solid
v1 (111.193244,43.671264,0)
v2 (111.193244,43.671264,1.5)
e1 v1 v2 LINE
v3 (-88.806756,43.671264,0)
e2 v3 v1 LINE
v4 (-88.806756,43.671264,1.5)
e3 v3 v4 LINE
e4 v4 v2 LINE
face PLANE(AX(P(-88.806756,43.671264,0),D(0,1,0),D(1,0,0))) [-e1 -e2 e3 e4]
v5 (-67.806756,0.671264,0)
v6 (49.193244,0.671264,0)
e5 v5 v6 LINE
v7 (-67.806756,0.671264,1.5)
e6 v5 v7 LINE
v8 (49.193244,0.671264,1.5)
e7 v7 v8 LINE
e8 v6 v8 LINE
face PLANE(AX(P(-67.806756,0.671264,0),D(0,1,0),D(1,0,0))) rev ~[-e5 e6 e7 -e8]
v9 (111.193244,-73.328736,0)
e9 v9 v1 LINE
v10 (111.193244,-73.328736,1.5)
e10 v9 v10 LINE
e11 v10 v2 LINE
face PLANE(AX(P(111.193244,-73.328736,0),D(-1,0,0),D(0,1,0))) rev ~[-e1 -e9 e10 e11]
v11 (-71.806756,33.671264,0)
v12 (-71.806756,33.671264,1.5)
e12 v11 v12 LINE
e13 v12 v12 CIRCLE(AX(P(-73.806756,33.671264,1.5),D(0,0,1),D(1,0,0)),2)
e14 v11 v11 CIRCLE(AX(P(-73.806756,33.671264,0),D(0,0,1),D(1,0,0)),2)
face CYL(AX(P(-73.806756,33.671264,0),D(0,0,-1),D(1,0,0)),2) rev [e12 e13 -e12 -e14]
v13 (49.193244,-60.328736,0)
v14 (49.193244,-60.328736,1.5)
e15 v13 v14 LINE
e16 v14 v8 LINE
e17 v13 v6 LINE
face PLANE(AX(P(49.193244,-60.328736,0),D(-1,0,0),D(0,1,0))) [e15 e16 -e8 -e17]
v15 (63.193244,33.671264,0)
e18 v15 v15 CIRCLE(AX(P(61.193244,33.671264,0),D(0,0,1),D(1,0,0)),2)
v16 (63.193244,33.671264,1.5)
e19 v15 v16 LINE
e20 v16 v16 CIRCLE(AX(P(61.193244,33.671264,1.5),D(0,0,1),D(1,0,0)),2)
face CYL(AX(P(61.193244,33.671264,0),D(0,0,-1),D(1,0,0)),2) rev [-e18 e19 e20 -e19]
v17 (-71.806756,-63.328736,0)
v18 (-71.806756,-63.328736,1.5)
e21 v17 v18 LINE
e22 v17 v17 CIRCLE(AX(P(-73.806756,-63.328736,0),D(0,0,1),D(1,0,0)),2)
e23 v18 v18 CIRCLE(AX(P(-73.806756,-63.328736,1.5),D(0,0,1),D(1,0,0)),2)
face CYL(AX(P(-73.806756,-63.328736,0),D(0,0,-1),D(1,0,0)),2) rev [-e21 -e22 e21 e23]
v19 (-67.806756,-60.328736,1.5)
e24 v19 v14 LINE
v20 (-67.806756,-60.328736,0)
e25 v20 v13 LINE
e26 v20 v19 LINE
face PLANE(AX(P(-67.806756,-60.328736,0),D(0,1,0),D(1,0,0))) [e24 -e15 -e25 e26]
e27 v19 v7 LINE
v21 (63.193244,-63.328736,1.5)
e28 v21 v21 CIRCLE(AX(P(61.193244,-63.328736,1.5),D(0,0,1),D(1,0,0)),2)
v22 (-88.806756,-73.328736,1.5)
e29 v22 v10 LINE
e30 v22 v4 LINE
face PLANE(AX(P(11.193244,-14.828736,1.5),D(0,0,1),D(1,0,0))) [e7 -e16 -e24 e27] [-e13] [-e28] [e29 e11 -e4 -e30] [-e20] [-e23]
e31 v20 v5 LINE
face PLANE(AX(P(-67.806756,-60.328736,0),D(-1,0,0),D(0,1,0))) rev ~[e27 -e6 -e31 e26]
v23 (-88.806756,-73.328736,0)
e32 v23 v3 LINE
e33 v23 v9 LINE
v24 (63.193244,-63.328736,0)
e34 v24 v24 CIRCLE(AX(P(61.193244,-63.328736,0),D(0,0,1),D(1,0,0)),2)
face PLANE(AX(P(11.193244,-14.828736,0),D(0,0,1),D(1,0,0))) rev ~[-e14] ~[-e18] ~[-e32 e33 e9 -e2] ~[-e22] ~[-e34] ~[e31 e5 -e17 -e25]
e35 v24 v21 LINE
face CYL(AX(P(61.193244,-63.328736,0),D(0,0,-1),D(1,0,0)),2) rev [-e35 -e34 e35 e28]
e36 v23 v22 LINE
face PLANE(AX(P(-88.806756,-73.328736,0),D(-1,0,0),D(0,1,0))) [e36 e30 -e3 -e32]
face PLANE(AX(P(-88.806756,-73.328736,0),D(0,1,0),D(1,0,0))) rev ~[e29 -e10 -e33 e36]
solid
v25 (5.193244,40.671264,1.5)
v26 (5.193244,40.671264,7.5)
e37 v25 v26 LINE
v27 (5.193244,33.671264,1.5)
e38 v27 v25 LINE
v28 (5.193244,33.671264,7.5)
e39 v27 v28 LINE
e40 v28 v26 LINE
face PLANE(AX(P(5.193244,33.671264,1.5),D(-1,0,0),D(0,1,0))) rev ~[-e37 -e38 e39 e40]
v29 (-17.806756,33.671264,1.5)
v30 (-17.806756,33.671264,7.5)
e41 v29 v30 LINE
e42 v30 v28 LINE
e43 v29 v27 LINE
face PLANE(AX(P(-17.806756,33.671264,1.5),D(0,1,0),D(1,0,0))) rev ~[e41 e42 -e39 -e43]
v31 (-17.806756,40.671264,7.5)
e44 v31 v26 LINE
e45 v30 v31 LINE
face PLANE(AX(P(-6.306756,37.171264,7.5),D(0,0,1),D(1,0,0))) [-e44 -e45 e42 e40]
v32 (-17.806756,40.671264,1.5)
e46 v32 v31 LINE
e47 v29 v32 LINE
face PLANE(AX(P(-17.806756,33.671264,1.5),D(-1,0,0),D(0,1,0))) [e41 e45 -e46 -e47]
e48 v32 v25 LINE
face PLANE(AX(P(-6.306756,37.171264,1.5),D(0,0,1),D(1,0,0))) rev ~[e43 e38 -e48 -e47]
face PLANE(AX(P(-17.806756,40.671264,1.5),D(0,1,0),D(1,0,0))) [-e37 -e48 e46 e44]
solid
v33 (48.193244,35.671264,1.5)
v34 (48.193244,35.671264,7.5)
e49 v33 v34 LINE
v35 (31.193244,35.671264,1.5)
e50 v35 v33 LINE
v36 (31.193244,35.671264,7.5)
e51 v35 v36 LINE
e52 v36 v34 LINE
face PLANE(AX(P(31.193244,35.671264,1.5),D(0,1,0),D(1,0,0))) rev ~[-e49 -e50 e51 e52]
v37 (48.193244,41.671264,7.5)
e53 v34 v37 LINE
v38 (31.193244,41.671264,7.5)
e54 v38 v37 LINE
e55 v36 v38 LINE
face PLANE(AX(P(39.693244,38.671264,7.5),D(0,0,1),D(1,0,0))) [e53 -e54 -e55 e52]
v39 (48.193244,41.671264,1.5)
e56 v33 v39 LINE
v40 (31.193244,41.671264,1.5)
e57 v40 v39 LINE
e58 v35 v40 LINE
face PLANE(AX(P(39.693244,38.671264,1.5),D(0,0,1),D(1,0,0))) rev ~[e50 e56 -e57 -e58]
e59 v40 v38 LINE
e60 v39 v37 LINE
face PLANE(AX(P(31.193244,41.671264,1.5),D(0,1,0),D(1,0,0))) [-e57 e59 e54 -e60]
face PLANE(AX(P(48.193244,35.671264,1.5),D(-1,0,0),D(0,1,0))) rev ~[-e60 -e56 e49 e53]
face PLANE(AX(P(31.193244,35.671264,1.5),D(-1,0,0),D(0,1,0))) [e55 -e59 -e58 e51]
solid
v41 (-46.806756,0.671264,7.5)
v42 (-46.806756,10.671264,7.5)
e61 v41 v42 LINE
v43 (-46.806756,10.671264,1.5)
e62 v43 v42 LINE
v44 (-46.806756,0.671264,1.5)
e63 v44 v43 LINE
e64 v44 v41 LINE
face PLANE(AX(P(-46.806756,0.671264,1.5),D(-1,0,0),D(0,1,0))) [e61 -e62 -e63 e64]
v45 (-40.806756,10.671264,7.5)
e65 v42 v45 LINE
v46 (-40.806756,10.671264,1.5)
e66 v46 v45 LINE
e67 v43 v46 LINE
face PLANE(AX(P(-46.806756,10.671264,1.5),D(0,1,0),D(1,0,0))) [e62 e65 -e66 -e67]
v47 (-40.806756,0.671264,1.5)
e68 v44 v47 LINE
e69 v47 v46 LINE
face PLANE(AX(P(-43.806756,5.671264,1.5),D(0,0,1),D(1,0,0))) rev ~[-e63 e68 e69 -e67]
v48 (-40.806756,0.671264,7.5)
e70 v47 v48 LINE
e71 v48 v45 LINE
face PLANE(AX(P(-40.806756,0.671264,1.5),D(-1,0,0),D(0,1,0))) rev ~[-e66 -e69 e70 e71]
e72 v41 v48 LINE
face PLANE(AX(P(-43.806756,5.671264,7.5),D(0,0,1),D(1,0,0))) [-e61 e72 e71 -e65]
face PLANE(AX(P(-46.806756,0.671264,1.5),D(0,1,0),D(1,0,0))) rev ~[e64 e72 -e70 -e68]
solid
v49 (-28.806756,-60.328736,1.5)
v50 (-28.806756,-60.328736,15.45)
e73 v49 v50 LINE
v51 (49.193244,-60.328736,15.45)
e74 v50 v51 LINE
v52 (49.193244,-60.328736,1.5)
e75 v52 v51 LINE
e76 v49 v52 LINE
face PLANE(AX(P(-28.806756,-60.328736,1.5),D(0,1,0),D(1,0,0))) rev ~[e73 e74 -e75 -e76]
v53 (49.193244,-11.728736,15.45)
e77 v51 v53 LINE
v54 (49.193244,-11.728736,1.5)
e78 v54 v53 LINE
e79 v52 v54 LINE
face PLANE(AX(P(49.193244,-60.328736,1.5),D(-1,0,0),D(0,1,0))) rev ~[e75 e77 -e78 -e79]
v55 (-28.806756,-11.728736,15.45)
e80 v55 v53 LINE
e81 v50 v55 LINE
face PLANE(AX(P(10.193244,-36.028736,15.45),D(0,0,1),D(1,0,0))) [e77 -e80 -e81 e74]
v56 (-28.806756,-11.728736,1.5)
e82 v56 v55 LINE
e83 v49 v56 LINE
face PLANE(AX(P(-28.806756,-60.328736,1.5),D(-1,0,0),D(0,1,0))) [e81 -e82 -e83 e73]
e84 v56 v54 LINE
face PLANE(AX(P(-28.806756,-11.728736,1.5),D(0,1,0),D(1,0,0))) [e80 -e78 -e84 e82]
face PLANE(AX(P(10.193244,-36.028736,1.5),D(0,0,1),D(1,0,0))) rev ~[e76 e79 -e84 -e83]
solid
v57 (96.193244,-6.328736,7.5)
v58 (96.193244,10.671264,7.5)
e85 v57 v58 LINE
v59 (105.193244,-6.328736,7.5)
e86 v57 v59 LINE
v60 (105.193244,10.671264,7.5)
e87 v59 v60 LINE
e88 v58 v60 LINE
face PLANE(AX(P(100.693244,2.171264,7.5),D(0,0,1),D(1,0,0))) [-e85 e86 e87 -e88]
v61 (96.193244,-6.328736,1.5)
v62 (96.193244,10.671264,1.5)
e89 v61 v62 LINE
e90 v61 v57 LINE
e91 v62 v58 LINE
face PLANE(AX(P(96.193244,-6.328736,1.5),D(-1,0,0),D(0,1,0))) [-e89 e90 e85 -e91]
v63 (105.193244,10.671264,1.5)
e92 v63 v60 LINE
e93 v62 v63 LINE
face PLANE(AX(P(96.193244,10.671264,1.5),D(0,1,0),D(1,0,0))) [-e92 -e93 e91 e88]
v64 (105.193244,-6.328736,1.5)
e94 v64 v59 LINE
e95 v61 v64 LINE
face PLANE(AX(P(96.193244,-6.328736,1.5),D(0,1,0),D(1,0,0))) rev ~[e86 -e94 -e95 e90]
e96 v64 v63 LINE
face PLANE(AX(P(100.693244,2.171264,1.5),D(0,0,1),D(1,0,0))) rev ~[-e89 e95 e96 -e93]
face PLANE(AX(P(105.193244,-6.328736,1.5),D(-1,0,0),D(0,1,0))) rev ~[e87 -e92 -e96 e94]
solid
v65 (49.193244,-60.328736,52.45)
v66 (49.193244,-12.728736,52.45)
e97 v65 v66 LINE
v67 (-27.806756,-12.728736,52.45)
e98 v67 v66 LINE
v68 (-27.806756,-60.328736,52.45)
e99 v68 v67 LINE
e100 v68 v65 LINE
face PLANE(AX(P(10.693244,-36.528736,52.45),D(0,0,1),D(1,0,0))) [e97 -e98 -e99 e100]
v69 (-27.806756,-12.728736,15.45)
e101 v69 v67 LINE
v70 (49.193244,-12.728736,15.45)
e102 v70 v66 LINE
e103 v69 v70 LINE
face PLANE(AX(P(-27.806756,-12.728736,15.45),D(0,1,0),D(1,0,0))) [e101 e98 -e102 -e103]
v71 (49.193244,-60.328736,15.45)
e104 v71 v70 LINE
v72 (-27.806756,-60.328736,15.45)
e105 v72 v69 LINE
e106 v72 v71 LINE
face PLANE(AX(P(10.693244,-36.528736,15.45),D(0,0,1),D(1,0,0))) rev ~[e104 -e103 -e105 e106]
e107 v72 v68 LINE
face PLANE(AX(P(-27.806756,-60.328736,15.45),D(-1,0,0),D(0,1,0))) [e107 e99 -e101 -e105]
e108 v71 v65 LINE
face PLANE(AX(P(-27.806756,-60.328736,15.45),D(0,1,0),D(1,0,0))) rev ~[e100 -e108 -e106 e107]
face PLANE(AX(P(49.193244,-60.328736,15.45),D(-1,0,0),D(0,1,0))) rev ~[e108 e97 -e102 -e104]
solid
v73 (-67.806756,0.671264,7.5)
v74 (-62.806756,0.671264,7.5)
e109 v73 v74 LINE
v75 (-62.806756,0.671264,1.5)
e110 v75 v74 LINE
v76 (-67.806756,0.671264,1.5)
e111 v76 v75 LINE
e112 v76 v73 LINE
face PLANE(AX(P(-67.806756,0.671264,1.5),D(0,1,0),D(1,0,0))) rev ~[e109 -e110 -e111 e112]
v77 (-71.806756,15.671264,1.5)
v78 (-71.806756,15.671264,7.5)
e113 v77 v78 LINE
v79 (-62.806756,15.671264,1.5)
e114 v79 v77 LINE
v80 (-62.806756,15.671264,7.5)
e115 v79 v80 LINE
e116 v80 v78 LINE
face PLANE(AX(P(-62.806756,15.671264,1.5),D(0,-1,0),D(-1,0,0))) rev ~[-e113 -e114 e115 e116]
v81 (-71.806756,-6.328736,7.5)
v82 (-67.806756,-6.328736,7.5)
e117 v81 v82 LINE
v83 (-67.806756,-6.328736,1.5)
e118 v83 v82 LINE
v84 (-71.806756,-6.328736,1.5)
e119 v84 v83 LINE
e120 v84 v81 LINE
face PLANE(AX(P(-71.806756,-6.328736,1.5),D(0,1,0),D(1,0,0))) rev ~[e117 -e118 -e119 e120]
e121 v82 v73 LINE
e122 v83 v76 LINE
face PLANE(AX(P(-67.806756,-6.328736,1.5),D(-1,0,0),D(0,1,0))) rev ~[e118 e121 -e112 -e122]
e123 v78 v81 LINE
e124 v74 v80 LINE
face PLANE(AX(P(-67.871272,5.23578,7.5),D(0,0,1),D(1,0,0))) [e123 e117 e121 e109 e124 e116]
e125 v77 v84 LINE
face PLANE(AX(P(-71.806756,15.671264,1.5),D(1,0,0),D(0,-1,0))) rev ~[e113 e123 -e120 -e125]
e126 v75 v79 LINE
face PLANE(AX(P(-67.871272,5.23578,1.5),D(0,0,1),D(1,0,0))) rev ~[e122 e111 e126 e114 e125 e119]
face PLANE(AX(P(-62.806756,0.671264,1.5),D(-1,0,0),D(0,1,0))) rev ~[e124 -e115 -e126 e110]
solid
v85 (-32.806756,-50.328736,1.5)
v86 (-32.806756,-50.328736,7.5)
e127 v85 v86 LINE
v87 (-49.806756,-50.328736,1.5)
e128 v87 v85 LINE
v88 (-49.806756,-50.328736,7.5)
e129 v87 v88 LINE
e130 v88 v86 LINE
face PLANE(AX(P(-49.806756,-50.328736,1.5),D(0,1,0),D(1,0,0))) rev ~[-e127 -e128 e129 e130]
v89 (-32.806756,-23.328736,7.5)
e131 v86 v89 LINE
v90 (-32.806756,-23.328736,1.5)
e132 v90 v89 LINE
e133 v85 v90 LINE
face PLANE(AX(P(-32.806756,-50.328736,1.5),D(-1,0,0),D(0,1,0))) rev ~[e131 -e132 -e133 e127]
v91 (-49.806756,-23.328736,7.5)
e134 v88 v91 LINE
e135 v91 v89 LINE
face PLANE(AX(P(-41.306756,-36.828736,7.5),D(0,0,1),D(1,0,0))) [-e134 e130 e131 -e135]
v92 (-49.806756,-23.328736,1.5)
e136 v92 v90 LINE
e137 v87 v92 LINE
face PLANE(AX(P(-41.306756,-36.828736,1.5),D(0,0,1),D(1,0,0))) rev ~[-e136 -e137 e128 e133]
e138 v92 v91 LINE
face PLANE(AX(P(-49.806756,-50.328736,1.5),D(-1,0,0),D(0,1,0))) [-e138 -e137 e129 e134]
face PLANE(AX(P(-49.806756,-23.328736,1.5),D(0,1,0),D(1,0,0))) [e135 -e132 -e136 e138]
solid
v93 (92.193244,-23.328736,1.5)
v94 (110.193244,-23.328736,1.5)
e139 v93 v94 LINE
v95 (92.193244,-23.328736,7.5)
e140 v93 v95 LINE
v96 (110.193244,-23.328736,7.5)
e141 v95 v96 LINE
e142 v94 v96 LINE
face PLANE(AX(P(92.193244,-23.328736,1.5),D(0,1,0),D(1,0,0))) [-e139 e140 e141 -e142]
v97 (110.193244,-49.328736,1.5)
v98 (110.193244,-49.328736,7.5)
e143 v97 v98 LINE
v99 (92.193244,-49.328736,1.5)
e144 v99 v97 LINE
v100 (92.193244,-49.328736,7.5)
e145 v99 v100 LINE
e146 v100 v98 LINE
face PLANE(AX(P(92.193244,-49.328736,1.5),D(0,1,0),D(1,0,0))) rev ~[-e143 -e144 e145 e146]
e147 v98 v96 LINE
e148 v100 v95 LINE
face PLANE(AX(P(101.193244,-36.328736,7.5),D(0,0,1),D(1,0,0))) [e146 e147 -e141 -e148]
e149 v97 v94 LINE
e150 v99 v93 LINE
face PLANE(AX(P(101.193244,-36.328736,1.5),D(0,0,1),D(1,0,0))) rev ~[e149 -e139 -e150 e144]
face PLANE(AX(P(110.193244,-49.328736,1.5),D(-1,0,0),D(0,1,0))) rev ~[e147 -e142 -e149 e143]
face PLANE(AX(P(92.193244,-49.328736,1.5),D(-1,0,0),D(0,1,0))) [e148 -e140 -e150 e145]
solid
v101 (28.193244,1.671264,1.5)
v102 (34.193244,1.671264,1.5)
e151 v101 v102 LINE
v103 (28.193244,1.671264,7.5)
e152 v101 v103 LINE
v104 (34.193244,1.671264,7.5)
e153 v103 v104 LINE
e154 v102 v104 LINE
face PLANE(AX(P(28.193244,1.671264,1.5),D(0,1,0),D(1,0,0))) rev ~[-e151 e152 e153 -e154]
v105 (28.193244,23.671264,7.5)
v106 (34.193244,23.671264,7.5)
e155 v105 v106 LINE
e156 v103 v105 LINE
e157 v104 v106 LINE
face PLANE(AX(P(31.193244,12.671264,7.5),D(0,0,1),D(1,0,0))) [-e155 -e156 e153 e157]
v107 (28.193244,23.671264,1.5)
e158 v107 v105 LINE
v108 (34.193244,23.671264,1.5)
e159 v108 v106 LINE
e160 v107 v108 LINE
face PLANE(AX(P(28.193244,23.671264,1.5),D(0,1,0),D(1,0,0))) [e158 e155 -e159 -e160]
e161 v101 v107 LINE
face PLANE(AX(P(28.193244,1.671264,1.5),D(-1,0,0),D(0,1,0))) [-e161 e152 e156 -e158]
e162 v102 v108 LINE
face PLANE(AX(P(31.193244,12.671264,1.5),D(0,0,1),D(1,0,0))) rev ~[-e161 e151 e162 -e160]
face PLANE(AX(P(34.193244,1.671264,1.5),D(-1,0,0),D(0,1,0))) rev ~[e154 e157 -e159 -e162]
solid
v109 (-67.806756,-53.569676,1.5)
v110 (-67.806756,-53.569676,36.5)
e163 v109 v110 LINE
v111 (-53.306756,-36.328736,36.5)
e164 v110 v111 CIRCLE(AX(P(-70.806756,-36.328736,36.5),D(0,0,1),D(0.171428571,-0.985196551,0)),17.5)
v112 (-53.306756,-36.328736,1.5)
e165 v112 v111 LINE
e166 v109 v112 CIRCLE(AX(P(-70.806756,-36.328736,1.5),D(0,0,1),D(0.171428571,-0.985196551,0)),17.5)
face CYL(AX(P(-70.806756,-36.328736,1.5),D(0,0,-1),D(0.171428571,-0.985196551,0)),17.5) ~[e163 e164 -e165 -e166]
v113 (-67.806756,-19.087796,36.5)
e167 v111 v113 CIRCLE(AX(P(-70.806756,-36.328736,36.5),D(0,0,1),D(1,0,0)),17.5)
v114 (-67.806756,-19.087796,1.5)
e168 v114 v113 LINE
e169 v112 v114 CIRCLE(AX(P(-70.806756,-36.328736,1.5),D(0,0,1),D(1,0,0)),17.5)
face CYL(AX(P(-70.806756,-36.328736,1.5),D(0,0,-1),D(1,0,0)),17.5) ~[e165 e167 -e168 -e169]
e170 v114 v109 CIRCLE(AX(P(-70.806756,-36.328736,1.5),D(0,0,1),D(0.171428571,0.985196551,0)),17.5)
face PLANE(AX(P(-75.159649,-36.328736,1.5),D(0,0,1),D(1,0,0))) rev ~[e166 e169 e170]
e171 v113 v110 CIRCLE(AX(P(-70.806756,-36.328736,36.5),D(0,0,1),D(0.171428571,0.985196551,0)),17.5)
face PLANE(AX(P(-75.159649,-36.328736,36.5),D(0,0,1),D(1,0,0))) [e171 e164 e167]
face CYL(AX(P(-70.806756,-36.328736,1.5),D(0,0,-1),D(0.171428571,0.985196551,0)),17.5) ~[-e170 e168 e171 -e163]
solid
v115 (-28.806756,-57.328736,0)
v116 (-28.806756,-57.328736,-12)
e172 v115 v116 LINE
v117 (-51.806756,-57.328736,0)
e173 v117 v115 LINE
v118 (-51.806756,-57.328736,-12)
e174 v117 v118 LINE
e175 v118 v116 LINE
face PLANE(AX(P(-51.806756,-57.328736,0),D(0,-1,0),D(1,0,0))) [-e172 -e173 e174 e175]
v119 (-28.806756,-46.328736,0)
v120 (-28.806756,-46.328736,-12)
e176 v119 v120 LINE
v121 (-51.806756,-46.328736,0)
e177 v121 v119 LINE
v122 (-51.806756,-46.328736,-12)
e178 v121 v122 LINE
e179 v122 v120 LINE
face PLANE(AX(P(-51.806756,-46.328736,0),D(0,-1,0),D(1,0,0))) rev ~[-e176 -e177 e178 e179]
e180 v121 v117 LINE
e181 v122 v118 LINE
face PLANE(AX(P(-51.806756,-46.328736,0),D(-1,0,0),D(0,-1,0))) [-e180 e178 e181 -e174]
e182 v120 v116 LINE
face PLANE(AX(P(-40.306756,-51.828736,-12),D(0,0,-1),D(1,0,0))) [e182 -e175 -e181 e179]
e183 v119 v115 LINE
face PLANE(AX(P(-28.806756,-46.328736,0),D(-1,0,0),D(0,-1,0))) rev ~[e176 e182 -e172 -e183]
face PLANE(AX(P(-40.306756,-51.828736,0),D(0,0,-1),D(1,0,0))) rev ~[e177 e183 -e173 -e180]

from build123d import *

# Parameters (mm, degrees)
F0_W      = 200
F0_H      = 117
F0_R      = 2
F0_W_2    = 117
F0_H_2    = 61
F1_DEPTH  = 1.5
F2_W      = 23
F2_H      = 7
F3_DEPTH  = 6
F2_W_2    = 17
F2_H_2    = 6
F2_W_3    = 6
F2_H_3    = 22
F2_W_4    = 18
F2_H_4    = 26
F2_H_5    = 27
F2_W_5    = 9
F2_H_6    = 17
F2_H_7    = 10
F4_DEPTH  = 35
F5_W      = 78
F5_H      = 48.6
F6_DEPTH  = 13.95
F7_W      = 77
F7_H      = 47.6
F8_DEPTH  = 37
F9_W      = 23
F9_H      = 11
F10_DEPTH = 12


with BuildPart() as f1:
    # F0 (on Top) → F1 (new body)
    with BuildSketch(Plane.XY):
        with Locations((11.1932437867, -14.8287359455)):
            Rectangle(F0_W, F0_H)
        with Locations((-73.8067562133, -63.3287359455)):
            Circle(F0_R, mode=Mode.SUBTRACT)
        with Locations((-9.3067562133, -29.8287359455)):
            Rectangle(F0_W_2, F0_H_2, mode=Mode.SUBTRACT)
        with Locations((61.1932437867, -63.3287359455)):
            Circle(F0_R, mode=Mode.SUBTRACT)
        with Locations((-73.8067562133, 33.6712640545)):
            Circle(F0_R, mode=Mode.SUBTRACT)
        with Locations((61.1932437867, 33.6712640545)):
            Circle(F0_R, mode=Mode.SUBTRACT)
    extrude(amount=F1_DEPTH)


with BuildPart() as f3:
    # F2 (on face) → F3 (new body)
    with BuildSketch(Plane.XY.offset(1.5)):
        with Locations((-6.3067562133, 37.1712640545)):
            Rectangle(F2_W, F2_H)
    extrude(amount=F3_DEPTH)


with BuildPart() as f3b:
    # F2 (on face) → F3, piece 2 (new body)
    with BuildSketch(Plane.XY.offset(1.5)):
        with Locations((39.6932437867, 38.6712640545)):
            Rectangle(F2_W_2, F2_H_2)
    extrude(amount=F3_DEPTH)


with BuildPart() as f3c:
    # F2 (on face) → F3, piece 3 (new body)
    with BuildSketch(Plane.XY.offset(1.5)):
        with Locations((31.1932437867, 12.6712640545)):
            Rectangle(F2_W_3, F2_H_3)
    extrude(amount=F3_DEPTH)


with BuildPart() as f3d:
    # F2 (on face) → F3, piece 4 (new body)
    with BuildSketch(Plane.XY.offset(1.5)):
        with Locations((101.1932437867, -36.3287359455)):
            Rectangle(F2_W_4, F2_H_4)
    extrude(amount=F3_DEPTH)


with BuildPart() as f3e:
    # F2 (on face) → F3, piece 5 (new body)
    with BuildSketch(Plane.XY.offset(1.5)):
        with Locations((-41.3067562133, -36.8287359455)):
            Rectangle(F2_W_2, F2_H_5)
    extrude(amount=F3_DEPTH)


with BuildPart() as f3f:
    # F2 (on face) → F3, piece 6 (new body)
    with BuildSketch(Plane.XY.offset(1.5)):
        Polygon((-71.8067562133, -6.3287359455), (-67.8067562133, -6.3287359455), (-67.8067562133, 0.6712640545), (-62.8067562133, 0.6712640545), (-62.8067562133, 15.6712640545), (-71.8067562133, 15.6712640545), align=None)
    extrude(amount=F3_DEPTH)


with BuildPart() as f3g:
    # F2 (on face) → F3, piece 7 (new body)
    with BuildSketch(Plane.XY.offset(1.5)):
        with Locations((100.6932437867, 2.1712640545)):
            Rectangle(F2_W_5, F2_H_6)
    extrude(amount=F3_DEPTH)


with BuildPart() as f3h:
    # F2 (on face) → F3, piece 8 (new body)
    with BuildSketch(Plane.XY.offset(1.5)):
        with Locations((-43.8067562133, 5.6712640545)):
            Rectangle(F2_W_3, F2_H_7)
    extrude(amount=F3_DEPTH)


with BuildPart() as f4:
    # F2 (on face) → F4 (new body)
    with BuildSketch(Plane.XY.offset(1.5)):
        with BuildLine():
            Line((-67.8067562133, -53.5696755951), (-67.8067562133, -19.087796296))
            ThreePointArc((-67.8067562133, -19.087796296), (-88.3067562133, -36.3287359455), (-67.8067562133, -53.5696755951))
        make_face()
        with BuildLine():
            ThreePointArc((-67.8067562133, -53.5696755951), (-57.4136609773, -47.5926162716), (-53.3067562133, -36.3287359455))
            ThreePointArc((-53.3067562133, -36.3287359455), (-57.4136609773, -25.0648556195), (-67.8067562133, -19.087796296))
            Line((-67.8067562133, -19.087796296), (-67.8067562133, -53.5696755951))
        make_face()
    extrude(amount=F4_DEPTH)


with BuildPart() as f6:
    # F5 (on face) → F6 (new body)
    with BuildSketch(Plane.XY.offset(1.5)):
        with Locations((10.1932437867, -36.0287359455)):
            Rectangle(F5_W, F5_H)
    extrude(amount=F6_DEPTH)


with BuildPart() as f8:
    # F7 (on face) → F8 (new body)
    with BuildSketch(Plane.XY.offset(15.45)):
        with Locations((10.6932437867, -36.5287359455)):
            Rectangle(F7_W, F7_H)
    extrude(amount=F8_DEPTH)


with BuildPart() as f10:
    # F9 (on face) → F10 (new body)
    with BuildSketch(Plane(origin=(0, 0, 0), x_dir=(1, 0, 0), z_dir=(0, 0, -1))):
        with Locations((-40.3067562133, 51.8287359455)):
            Rectangle(F9_W, F9_H)
    extrude(amount=F10_DEPTH)


solid = Compound([f1.part, f3.part, f3b.part, f3c.part, f3d.part, f3e.part, f3f.part, f3g.part, f3h.part, f4.part, f6.part, f8.part, f10.part])
